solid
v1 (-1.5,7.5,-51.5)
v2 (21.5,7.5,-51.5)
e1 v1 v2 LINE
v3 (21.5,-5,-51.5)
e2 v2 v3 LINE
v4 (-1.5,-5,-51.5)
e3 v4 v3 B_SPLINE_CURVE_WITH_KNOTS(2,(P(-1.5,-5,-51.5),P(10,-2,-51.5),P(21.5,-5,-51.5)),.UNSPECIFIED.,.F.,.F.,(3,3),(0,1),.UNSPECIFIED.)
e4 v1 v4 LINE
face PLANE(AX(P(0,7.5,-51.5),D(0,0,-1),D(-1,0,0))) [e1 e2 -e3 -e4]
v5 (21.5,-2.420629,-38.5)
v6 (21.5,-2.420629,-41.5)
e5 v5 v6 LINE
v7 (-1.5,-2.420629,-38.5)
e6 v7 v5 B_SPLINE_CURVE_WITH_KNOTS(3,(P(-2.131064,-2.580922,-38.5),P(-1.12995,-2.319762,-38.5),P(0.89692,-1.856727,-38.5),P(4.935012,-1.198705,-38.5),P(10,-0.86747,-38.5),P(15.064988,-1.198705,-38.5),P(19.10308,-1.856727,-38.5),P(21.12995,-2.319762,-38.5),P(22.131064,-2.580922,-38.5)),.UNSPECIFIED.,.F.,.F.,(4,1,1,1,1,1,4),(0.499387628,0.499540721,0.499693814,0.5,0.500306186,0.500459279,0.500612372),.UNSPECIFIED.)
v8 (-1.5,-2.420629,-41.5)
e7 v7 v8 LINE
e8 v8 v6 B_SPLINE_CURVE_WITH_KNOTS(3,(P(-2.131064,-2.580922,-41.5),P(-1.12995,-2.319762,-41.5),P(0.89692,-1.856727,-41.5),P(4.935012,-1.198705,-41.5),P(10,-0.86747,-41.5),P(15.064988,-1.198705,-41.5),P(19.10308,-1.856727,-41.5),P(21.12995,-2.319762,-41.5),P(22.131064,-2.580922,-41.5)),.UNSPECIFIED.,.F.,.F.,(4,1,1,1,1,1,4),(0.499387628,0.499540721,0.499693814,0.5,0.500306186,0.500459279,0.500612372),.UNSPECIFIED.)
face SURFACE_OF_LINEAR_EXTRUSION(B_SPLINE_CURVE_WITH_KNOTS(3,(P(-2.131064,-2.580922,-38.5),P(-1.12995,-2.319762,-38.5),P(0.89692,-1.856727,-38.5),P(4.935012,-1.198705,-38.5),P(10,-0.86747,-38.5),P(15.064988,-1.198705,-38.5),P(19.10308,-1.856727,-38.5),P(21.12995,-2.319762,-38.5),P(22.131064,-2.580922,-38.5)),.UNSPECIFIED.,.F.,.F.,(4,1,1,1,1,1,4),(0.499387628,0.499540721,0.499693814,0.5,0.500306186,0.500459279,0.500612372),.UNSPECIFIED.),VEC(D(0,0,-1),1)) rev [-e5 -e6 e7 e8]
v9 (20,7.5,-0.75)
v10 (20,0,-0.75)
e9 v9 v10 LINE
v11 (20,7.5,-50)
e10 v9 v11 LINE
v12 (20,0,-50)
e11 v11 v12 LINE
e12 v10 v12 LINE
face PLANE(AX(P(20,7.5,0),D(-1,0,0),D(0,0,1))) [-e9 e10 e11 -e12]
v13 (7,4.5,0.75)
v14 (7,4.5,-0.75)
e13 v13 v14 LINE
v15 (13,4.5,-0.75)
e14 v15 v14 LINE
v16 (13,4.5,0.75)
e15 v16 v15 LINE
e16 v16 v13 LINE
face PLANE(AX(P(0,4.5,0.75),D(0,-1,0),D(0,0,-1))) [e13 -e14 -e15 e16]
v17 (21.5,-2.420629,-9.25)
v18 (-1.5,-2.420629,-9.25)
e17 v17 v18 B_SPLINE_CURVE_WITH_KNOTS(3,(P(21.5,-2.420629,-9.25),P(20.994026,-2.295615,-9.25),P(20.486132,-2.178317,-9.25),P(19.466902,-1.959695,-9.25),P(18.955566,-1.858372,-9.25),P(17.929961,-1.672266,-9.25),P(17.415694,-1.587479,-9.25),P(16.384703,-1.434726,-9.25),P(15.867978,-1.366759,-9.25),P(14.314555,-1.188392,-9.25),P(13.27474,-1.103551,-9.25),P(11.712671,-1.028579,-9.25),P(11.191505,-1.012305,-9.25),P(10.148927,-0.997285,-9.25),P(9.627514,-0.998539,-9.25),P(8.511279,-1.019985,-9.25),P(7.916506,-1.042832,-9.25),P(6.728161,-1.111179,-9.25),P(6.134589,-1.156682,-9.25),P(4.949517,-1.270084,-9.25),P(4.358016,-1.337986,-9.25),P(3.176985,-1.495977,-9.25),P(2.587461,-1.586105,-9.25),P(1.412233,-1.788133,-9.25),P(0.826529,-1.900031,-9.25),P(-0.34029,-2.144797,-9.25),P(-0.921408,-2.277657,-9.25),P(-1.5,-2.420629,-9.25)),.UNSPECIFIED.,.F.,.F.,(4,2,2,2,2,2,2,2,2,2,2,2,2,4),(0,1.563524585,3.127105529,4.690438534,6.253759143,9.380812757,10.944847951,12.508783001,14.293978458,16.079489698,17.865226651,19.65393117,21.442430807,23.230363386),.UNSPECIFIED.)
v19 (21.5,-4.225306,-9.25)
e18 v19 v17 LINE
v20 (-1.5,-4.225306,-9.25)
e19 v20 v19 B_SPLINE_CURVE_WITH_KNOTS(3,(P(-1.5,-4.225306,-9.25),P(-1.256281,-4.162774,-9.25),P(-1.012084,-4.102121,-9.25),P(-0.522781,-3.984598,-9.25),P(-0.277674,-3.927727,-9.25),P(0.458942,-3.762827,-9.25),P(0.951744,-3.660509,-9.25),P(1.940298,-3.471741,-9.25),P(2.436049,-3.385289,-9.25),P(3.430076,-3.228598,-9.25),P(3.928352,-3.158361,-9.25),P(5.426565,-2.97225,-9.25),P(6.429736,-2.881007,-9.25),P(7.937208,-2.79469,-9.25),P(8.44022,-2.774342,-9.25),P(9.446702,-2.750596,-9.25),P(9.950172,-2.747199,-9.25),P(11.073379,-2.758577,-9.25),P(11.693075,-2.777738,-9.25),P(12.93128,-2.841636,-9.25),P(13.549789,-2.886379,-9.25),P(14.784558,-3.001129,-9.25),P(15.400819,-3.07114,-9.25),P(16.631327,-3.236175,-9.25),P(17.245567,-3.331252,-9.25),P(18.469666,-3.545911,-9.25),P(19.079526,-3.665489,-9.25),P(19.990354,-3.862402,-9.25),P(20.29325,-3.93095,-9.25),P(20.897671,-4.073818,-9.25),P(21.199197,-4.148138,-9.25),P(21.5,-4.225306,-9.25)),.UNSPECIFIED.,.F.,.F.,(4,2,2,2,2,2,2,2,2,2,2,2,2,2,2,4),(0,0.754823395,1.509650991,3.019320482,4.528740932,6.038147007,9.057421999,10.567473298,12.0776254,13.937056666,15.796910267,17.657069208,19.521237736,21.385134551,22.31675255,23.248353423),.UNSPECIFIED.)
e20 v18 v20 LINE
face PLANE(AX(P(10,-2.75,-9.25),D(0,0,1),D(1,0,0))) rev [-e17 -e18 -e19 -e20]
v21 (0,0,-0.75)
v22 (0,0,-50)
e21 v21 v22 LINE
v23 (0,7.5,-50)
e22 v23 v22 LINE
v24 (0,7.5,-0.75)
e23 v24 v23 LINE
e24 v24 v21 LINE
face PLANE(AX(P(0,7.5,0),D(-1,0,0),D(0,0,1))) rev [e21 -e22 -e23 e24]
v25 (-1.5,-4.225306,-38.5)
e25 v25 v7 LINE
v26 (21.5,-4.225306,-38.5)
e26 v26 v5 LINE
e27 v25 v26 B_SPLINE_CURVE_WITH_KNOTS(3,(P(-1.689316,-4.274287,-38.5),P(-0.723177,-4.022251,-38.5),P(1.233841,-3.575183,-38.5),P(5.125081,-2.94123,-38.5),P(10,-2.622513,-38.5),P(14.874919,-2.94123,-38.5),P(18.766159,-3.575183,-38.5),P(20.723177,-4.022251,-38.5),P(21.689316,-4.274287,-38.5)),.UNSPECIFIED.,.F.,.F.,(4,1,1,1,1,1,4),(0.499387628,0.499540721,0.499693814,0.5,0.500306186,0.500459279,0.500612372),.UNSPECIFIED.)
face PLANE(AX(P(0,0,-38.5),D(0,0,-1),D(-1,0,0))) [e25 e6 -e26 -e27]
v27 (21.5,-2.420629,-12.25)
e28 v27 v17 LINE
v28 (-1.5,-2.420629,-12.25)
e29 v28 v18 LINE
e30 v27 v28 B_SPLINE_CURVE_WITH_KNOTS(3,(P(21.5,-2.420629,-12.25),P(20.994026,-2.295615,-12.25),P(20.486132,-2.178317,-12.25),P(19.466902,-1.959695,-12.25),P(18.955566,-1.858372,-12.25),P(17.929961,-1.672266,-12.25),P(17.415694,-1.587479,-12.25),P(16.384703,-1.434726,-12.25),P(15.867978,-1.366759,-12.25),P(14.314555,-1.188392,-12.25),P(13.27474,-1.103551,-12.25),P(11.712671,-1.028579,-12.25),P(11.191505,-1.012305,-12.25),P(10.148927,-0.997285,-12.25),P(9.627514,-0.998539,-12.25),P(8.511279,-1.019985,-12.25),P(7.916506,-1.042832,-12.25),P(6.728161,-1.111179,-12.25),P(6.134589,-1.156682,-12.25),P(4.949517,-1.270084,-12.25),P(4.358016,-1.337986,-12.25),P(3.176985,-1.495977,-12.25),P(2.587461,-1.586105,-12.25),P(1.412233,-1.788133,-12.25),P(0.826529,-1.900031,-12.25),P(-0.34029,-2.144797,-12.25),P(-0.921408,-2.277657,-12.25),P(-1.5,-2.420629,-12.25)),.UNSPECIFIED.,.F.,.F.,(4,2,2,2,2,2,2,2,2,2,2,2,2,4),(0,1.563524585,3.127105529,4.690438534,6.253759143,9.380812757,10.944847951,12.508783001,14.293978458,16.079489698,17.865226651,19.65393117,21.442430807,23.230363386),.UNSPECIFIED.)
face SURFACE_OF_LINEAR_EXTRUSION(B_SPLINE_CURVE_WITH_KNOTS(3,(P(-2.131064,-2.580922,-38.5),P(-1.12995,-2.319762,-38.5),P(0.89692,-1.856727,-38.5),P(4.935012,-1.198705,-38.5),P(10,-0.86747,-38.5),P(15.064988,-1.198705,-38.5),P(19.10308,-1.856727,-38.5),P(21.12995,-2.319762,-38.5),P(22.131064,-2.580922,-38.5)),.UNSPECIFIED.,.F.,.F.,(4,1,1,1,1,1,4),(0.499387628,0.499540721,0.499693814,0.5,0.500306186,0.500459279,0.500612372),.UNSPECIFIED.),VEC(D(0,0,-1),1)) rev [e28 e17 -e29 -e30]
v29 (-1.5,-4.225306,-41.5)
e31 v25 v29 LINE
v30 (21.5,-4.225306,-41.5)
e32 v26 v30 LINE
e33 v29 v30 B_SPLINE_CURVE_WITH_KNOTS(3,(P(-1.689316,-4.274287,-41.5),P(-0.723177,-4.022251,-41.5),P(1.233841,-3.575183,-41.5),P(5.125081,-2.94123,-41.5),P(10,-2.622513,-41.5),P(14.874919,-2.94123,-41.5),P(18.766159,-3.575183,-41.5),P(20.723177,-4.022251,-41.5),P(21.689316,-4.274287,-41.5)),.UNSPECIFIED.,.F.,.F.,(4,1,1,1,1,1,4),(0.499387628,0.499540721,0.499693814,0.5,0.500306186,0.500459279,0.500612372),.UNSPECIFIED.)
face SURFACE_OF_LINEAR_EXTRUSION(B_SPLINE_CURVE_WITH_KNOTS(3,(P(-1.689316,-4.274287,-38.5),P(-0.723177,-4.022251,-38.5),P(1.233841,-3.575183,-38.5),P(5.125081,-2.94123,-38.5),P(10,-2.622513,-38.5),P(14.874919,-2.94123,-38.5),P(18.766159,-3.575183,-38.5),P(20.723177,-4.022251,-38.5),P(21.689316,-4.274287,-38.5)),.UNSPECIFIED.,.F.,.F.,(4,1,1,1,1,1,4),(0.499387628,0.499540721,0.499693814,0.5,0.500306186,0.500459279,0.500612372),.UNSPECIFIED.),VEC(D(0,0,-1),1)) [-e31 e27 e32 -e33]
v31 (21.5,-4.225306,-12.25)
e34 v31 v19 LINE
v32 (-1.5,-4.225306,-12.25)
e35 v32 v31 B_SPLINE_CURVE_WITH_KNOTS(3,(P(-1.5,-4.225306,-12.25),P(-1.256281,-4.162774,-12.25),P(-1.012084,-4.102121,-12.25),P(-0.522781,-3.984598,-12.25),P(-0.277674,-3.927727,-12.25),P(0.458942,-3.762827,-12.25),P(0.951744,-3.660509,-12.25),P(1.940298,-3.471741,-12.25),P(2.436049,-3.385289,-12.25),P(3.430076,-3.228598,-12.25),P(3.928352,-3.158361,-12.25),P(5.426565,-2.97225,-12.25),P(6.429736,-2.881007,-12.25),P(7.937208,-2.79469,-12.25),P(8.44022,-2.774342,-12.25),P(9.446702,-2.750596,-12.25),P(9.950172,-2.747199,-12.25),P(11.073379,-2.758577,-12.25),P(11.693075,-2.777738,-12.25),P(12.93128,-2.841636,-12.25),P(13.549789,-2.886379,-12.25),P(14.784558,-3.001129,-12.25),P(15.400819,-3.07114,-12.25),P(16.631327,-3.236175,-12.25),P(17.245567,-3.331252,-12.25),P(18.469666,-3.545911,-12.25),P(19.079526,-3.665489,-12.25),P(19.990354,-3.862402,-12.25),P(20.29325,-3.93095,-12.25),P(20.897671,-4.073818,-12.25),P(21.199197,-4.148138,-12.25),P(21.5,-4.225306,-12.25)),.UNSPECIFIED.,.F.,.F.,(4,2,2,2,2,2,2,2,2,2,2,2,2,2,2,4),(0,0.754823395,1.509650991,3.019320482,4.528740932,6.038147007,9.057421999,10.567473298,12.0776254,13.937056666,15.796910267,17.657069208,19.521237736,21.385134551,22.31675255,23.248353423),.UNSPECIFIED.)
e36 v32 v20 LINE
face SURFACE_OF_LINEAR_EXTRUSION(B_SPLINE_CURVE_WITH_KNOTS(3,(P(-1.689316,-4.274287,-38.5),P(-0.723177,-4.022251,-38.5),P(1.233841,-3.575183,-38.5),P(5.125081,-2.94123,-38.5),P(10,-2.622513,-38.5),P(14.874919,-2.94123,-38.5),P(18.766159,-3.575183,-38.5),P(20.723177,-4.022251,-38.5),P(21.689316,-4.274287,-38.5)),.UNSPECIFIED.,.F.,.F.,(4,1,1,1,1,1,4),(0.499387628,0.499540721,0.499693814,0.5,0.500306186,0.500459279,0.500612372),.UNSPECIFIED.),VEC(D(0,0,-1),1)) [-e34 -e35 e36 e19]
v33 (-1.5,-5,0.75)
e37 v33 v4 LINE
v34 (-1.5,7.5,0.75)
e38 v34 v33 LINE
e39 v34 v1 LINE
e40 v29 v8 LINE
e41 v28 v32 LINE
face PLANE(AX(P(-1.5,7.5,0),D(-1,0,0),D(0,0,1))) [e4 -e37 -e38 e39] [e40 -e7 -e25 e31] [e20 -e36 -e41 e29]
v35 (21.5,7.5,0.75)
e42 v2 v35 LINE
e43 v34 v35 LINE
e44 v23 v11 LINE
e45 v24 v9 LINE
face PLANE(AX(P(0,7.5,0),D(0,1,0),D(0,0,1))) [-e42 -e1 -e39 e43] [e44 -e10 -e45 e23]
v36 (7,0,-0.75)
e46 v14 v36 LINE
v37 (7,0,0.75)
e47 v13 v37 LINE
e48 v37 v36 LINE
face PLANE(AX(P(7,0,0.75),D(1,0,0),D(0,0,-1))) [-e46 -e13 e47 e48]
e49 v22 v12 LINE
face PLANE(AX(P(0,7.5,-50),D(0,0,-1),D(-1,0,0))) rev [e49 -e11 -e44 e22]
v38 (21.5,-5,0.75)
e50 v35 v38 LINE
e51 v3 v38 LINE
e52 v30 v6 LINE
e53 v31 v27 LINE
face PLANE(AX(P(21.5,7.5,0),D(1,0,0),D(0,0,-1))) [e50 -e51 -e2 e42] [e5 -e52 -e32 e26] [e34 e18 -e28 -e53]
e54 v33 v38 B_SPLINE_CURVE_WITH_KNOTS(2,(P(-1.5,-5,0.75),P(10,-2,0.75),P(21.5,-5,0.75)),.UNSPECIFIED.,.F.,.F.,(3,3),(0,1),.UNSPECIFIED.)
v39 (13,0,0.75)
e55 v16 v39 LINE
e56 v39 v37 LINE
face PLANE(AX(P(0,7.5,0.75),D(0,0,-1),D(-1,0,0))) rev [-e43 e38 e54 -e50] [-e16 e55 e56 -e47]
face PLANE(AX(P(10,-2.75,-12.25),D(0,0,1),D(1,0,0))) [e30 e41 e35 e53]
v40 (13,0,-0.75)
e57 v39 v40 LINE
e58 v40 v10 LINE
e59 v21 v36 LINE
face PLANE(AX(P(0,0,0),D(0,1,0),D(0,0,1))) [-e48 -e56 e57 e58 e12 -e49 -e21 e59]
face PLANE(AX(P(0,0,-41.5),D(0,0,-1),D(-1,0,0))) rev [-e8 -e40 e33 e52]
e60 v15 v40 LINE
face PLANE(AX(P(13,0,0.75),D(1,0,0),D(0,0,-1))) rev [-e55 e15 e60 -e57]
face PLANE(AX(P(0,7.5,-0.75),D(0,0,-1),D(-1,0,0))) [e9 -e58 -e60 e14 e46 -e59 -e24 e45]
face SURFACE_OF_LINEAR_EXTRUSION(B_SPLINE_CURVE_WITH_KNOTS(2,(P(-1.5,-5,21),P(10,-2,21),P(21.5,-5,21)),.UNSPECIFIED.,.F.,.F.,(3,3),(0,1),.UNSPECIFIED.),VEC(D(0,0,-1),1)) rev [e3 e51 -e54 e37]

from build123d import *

# Parameters (mm, degrees)
SKETCH2_W           = 23
SKETCH2_H           = 52.25
SKETCH2_W_2         = 20
SKETCH2_H_2         = 49.25
BOSS_EXTRUDE1_DEPTH = 7.5
SKETCH3_W           = 23
SKETCH3_H           = 52.25
BOSS_EXTRUDE2_DEPTH = 5
SKETCH4_W           = 6
SKETCH4_H           = 4.5
CUT_EXTRUDE1_DEPTH  = 1.5
CUT_EXTRUDE2_DEPTH  = 72.5
CUT_EXTRUDE3_START  = -3
CUT_EXTRUDE3_DEPTH  = 3
CUT_EXTRUDE4_DEPTH  = 3


# Read off the part's stored shape, not the designer's step: Cut-Extrude3
with BuildPart() as part:
    # Sketch2 → Boss-Extrude1 (new body)
    with BuildSketch(Plane(origin=(0, 0, 0), x_dir=(1, 0, 0), z_dir=(0, 1, 0))):
        with Locations((10, 25.375)):
            Rectangle(SKETCH2_W, SKETCH2_H)
        with Locations((10, 25.375)):
            Rectangle(SKETCH2_W_2, SKETCH2_H_2, mode=Mode.SUBTRACT)
    extrude(amount=BOSS_EXTRUDE1_DEPTH)

    # Sketch3 → Boss-Extrude2 (add)
    with BuildSketch(Plane.XZ):
        with Locations((10, -25.375)):
            Rectangle(SKETCH3_W, SKETCH3_H)
    extrude(amount=BOSS_EXTRUDE2_DEPTH)

    # Sketch4 → Cut-Extrude1 (cut)
    with BuildSketch(Plane(origin=(0, 0, -0.75), x_dir=(-1, 0, 0), z_dir=(0, 0, -1))):
        with Locations((-10, 2.25)):
            Rectangle(SKETCH4_W, SKETCH4_H)
    extrude(amount=-CUT_EXTRUDE1_DEPTH, mode=Mode.SUBTRACT)

    # Sketch5 → Cut-Extrude2 (cut)
    with BuildSketch(Plane(origin=(0, 0, -51.5), x_dir=(-1, 0, 0), z_dir=(0, 0, -1))):
        with BuildLine():
            Line((1.5, -5), (-21.5, -5))
            add(Edge.make_bspline(
                [(1.5, -5), (-10, -2), (-21.5, -5)],
                knots=[0, 0, 0, 1, 1, 1], degree=2))
        make_face()
    extrude(amount=-CUT_EXTRUDE2_DEPTH, mode=Mode.SUBTRACT)

    # Cut-Extrude3 outline → Cut-Extrude3 (cut)
    with BuildSketch(Plane(origin=(0, 0, -41.5), x_dir=(-1, 0, 0), z_dir=(0, 0, -1)).offset(CUT_EXTRUDE3_START)):
        with BuildLine():
            add(Edge.make_bspline(
                [(1.500000004, -4.225305609), (0.595466246, -3.993211731), (-1.297330219, -3.56483897), (-5.125081209, -2.941229912), (-10, -2.622513392), (-14.874918791, -2.941229912), (-18.702669782, -3.56483897), (-20.595466246, -3.993211731), (-21.500000004, -4.225305609)],
                knots=[0.499397619, 0.499397619, 0.499397619, 0.499397619, 0.499540721, 0.499693814, 0.5, 0.500306186, 0.500459279, 0.500602381, 0.500602381, 0.500602381, 0.500602381], degree=3))
            Line((1.500000004, -4.225305609), (1.5, -2.420629216))
            add(Edge.make_bspline(
                [(1.5, -2.420629216), (0.70515637, -2.224171116), (-1.108540102, -1.822242739), (-4.935012294, -1.198704697), (-10, -0.867469997), (-15.064987706, -1.198704697), (-18.891459898, -1.822242739), (-20.70515637, -2.224171116), (-21.499999999, -2.420629215)],
                knots=[0.499419719, 0.499419719, 0.499419719, 0.499419719, 0.499540721, 0.499693814, 0.5, 0.500306186, 0.500459279, 0.500580281, 0.500580281, 0.500580281, 0.500580281], degree=3))
            Line((-21.499999999, -2.420629215), (-21.500000004, -4.225305609))
        make_face()
    extrude(amount=CUT_EXTRUDE3_DEPTH, mode=Mode.SUBTRACT)

    # Sketch7 → Cut-Extrude4 (cut)
    with BuildSketch(Plane.XY.offset(-9.25)):
        with BuildLine():
            Line((-1.499999999, -2.420629215), (-1.500000004, -4.225305609))
            add(Edge.make_bspline(
                [(-1.500000004, -4.225305609), (-0.595466246, -3.993211731), (1.297330219, -3.56483897), (5.125081209, -2.941229912), (10, -2.622513392), (14.874918791, -2.941229912), (18.702669782, -3.56483897), (20.595466246, -3.993211731), (21.500000004, -4.225305609)],
                knots=[0.499397619, 0.499397619, 0.499397619, 0.499397619, 0.499540721, 0.499693814, 0.5, 0.500306186, 0.500459279, 0.500602381, 0.500602381, 0.500602381, 0.500602381], degree=3))
            Line((21.500000004, -4.225305609), (21.499999999, -2.420629215))
            add(Edge.make_bspline(
                [(21.499999999, -2.420629215), (20.70515637, -2.224171116), (18.891459898, -1.822242739), (15.064987706, -1.198704697), (10, -0.867469997), (4.935012294, -1.198704697), (1.108540102, -1.822242739), (-0.70515637, -2.224171116), (-1.499999999, -2.420629215)],
                knots=[0.499419719, 0.499419719, 0.499419719, 0.499419719, 0.499540721, 0.499693814, 0.5, 0.500306186, 0.500459279, 0.500580281, 0.500580281, 0.500580281, 0.500580281], degree=3))
        make_face()
    extrude(amount=-CUT_EXTRUDE4_DEPTH, mode=Mode.SUBTRACT)


solid = part.part
